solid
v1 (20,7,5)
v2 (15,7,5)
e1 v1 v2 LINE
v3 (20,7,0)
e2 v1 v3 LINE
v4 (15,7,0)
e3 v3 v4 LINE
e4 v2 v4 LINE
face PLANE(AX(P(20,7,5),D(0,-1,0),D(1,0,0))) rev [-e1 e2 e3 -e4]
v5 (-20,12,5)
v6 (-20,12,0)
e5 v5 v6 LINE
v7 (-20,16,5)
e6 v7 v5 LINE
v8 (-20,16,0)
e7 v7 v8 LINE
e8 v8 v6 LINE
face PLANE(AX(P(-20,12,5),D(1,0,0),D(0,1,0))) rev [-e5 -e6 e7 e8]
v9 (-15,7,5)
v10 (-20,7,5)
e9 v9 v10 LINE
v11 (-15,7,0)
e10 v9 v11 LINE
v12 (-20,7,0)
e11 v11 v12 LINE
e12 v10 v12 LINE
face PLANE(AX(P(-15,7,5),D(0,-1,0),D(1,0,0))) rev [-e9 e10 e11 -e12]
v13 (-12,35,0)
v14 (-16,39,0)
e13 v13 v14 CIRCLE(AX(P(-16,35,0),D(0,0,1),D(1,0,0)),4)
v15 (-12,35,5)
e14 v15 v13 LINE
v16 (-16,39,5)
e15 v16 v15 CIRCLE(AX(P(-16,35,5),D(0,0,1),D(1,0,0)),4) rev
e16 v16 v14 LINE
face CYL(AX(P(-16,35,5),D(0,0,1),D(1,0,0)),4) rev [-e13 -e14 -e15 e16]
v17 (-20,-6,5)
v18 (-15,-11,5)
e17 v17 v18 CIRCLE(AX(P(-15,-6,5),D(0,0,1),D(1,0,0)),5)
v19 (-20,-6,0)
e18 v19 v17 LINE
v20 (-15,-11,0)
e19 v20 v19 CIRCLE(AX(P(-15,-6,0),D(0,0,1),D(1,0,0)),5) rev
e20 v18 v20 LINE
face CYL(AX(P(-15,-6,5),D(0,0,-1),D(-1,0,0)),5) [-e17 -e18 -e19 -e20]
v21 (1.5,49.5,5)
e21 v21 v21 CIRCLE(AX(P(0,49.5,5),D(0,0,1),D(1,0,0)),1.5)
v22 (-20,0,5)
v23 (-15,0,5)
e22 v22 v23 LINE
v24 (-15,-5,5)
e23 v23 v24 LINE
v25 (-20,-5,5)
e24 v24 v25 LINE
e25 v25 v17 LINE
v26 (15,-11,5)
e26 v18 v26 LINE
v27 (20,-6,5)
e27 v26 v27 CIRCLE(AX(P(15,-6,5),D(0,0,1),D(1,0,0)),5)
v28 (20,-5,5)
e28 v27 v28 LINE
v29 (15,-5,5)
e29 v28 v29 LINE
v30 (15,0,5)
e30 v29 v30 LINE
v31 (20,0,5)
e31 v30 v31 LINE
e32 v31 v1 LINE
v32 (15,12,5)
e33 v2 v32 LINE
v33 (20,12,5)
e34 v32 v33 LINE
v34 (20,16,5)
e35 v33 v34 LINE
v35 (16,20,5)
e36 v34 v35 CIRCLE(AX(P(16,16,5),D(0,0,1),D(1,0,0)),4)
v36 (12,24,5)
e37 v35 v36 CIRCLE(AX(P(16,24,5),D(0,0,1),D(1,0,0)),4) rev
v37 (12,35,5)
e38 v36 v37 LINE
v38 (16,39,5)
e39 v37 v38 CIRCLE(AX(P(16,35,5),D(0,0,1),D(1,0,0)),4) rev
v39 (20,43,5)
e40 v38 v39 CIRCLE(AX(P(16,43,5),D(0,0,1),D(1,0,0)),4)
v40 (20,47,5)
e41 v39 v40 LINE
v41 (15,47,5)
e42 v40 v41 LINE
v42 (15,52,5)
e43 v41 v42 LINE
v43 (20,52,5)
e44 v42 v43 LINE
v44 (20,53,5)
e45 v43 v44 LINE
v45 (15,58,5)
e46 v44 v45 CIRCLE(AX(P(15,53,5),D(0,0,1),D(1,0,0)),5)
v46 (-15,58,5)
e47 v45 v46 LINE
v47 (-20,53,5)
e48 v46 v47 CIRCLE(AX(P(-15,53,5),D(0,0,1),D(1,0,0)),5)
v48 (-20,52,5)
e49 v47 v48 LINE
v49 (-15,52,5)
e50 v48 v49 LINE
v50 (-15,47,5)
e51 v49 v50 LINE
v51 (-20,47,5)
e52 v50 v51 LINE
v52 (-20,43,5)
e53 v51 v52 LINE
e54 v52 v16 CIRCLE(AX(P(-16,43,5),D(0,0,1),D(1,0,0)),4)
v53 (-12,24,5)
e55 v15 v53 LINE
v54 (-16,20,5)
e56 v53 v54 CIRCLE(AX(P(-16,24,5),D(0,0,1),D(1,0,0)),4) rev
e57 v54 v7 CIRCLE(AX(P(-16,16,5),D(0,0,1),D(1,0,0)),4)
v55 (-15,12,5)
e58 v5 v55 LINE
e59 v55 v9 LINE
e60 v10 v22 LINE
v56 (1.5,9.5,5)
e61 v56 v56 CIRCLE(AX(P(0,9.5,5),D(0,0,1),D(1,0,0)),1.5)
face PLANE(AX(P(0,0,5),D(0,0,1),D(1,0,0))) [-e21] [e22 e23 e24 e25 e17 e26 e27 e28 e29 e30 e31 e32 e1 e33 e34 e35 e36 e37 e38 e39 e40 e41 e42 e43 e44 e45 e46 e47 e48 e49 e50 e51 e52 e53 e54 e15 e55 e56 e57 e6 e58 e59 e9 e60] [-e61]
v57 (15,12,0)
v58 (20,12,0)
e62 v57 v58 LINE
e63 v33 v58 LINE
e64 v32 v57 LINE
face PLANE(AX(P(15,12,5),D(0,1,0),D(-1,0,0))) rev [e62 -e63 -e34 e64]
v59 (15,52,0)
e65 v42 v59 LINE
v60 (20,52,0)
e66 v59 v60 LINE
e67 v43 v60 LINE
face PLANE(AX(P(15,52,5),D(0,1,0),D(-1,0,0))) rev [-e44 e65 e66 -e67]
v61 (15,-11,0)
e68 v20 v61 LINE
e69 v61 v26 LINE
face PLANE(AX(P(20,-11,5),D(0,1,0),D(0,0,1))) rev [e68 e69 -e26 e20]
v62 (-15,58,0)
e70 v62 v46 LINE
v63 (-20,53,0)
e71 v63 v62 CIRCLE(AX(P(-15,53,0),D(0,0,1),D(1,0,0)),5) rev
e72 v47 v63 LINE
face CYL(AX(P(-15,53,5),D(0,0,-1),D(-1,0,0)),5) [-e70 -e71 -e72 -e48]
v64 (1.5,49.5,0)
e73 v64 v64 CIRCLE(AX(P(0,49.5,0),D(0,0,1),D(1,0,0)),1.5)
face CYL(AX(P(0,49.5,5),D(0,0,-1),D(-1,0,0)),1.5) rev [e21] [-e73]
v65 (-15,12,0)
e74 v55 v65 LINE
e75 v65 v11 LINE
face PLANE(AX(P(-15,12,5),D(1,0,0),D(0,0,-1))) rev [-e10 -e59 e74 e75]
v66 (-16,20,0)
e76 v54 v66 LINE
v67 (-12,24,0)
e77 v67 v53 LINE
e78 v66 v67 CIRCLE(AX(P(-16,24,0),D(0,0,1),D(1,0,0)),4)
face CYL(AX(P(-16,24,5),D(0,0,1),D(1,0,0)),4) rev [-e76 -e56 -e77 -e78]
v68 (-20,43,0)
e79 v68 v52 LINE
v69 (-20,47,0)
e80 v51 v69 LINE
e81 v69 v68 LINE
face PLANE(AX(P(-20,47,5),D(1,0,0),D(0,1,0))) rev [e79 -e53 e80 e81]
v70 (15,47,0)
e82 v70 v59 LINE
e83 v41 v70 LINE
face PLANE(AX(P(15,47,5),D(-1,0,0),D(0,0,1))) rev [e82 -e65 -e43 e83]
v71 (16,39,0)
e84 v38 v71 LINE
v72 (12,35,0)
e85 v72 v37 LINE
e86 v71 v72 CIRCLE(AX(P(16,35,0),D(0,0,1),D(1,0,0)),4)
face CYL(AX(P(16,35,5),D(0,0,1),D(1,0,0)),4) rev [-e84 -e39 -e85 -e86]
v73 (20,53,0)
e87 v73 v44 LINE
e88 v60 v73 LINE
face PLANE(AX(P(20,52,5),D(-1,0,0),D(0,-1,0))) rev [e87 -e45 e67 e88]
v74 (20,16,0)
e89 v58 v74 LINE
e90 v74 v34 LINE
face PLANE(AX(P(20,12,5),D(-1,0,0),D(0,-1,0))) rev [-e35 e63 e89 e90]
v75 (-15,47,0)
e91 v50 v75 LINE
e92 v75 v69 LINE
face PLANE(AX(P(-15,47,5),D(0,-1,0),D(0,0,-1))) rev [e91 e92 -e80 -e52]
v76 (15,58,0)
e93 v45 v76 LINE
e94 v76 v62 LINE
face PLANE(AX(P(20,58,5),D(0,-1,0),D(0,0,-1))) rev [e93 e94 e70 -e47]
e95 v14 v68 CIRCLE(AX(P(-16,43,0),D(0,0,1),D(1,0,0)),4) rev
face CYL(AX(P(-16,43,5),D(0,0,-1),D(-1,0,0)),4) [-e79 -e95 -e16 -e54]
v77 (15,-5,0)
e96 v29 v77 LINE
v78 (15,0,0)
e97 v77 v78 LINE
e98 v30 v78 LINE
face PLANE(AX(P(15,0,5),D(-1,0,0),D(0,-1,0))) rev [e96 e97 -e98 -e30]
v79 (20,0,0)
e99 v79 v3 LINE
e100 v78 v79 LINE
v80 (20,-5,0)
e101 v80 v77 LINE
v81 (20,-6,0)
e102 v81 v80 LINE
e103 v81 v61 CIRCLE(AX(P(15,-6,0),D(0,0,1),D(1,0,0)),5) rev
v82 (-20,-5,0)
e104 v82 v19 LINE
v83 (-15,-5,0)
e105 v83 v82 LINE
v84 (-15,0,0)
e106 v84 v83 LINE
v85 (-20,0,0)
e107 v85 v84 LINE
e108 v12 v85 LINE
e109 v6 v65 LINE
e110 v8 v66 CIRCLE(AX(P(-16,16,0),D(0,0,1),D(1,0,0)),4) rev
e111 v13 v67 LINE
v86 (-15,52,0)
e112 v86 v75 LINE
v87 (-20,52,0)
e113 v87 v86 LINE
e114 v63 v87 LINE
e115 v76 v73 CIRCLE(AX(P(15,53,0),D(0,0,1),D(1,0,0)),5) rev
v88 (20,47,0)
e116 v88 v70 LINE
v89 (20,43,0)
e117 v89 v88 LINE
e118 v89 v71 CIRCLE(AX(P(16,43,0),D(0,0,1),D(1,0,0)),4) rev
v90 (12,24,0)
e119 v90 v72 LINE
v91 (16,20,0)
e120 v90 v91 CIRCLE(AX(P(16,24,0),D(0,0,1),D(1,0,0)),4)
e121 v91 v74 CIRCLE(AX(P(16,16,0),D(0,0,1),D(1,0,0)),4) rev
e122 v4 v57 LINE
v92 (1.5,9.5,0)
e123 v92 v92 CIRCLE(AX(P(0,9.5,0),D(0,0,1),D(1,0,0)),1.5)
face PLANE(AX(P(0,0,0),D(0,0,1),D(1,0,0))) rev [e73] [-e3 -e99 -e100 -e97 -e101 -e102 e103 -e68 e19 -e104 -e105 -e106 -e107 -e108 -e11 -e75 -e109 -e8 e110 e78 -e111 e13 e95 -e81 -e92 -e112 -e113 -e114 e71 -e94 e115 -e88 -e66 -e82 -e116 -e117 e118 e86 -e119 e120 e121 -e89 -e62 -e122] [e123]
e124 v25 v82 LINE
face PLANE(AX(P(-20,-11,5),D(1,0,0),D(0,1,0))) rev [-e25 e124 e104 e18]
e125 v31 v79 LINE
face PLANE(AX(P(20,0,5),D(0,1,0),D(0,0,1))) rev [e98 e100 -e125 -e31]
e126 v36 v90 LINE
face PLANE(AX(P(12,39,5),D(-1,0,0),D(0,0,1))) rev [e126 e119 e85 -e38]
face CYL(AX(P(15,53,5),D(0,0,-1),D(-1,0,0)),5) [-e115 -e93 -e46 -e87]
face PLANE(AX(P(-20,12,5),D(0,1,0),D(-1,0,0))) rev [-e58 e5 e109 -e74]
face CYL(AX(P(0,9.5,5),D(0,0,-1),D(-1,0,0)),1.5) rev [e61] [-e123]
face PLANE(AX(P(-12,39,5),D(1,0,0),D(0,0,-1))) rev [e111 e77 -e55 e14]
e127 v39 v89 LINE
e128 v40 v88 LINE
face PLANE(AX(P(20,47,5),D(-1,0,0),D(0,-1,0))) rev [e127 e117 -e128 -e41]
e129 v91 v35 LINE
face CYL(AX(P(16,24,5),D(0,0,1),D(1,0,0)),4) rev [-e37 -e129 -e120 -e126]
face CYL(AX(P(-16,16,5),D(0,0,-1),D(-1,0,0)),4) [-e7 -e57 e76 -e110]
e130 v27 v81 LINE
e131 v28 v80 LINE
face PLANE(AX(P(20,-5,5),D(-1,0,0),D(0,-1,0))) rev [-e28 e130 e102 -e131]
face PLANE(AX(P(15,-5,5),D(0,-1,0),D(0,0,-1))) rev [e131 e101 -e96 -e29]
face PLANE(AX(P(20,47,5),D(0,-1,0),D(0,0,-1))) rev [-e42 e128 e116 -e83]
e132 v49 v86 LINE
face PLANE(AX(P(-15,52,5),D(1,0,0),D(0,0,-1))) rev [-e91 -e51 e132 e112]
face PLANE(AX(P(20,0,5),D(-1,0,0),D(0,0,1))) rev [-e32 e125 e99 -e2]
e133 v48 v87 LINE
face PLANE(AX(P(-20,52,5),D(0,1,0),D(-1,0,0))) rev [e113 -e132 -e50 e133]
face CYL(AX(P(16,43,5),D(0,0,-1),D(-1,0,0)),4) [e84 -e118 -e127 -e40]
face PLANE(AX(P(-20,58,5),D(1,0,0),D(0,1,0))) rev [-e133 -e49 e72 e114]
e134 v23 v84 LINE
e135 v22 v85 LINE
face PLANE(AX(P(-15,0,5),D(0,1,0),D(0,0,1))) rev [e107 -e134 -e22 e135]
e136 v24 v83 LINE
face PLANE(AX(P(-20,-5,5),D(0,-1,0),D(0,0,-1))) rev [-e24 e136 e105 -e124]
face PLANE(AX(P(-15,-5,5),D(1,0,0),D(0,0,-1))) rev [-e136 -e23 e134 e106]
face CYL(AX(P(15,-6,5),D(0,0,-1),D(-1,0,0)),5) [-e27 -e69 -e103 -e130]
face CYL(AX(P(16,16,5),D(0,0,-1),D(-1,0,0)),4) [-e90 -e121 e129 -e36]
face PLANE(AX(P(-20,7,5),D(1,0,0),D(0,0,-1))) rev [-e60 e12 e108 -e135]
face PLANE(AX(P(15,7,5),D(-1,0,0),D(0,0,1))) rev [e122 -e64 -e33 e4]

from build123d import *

# Parameters (mm, degrees)
ESQUISSE1_R        = 1.5
BOSS_EXTRU_1_DEPTH = 5
CONG_1_R           = 5
CONG_3_START       = -1
CONG_3_DEPTH       = 7
CONG_3_2_DEPTH     = 5


with BuildPart() as part:
    # Esquisse1 → Boss.-Extru.1 (new body)
    with BuildSketch(Plane.XY):
        Polygon((20, 0), (20, 7), (15, 7), (15, 12), (20, 12), (20, 20), (12, 20), (12, 39), (20, 39), (20, 47), (15, 47), (15, 52), (20, 52), (20, 58), (-20, 58), (-20, 52), (-15, 52), (-15, 47), (-20, 47), (-20, 39), (-12, 39), (-12, 20), (-20, 20), (-20, 12), (-15, 12), (-15, 7), (-20, 7), (-20, 0), (-15, 0), (-15, -5), (-20, -5), (-20, -11), (20, -11), (20, -5), (15, -5), (15, 0), align=None)
        with Locations((0, 49.5)):
            Circle(ESQUISSE1_R, mode=Mode.SUBTRACT)
        with Locations((0, 9.5)):
            Circle(ESQUISSE1_R, mode=Mode.SUBTRACT)
    extrude(amount=BOSS_EXTRU_1_DEPTH)

    # Congé1
    cong_1_edges = [part.edges().sort_by_distance(p)[0] for p in [
        (-20, 58, 2.5),
        (20, 58, 2.5),
        (20, -11, 2.5),
        (-20, -11, 2.5),
    ]]
    fillet(cong_1_edges, radius=CONG_1_R)

    # Congé3: read off the stored shape, not the designer's step
    # Congé3 outline → Congé3 (cut)
    with BuildSketch(Plane.XY.offset(CONG_3_START)):
        with BuildLine():
            Line((20, 20), (16, 20))
            ThreePointArc((16, 20), (18.828427125, 18.828427125), (20, 16))
            Line((20, 16), (20, 20))
        make_face()
        with BuildLine():
            ThreePointArc((20, 43), (18.828427125, 40.171572875), (16, 39))
            Line((16, 39), (20, 39))
            Line((20, 39), (20, 43))
        make_face()
        with BuildLine():
            Line((-20, 39), (-16, 39))
            ThreePointArc((-16, 39), (-18.828427125, 40.171572875), (-20, 43))
            Line((-20, 43), (-20, 39))
        make_face()
        with BuildLine():
            ThreePointArc((-20, 16), (-18.828427125, 18.828427125), (-16, 20))
            Line((-16, 20), (-20, 20))
            Line((-20, 20), (-20, 16))
        make_face()
    extrude(amount=CONG_3_DEPTH, mode=Mode.SUBTRACT)

    # Cong_3 2 outline → Cong_3 2 (add)
    with BuildSketch(Plane.XY):
        with BuildLine():
            Line((12, 39), (12, 35))
            ThreePointArc((12, 35), (13.171572875, 37.828427125), (16, 39))
            Line((16, 39), (12, 39))
        make_face()
        with BuildLine():
            ThreePointArc((16, 20), (13.171572875, 21.171572875), (12, 24))
            Line((12, 24), (12, 20))
            Line((12, 20), (16, 20))
        make_face()
        with BuildLine():
            ThreePointArc((-16, 39), (-13.171572875, 37.828427125), (-12, 35))
            Line((-12, 35), (-12, 39))
            Line((-12, 39), (-16, 39))
        make_face()
        with BuildLine():
            ThreePointArc((-12, 24), (-13.171572875, 21.171572875), (-16, 20))
            Line((-16, 20), (-12, 20))
            Line((-12, 20), (-12, 24))
        make_face()
    extrude(amount=CONG_3_2_DEPTH)


solid = part.part
